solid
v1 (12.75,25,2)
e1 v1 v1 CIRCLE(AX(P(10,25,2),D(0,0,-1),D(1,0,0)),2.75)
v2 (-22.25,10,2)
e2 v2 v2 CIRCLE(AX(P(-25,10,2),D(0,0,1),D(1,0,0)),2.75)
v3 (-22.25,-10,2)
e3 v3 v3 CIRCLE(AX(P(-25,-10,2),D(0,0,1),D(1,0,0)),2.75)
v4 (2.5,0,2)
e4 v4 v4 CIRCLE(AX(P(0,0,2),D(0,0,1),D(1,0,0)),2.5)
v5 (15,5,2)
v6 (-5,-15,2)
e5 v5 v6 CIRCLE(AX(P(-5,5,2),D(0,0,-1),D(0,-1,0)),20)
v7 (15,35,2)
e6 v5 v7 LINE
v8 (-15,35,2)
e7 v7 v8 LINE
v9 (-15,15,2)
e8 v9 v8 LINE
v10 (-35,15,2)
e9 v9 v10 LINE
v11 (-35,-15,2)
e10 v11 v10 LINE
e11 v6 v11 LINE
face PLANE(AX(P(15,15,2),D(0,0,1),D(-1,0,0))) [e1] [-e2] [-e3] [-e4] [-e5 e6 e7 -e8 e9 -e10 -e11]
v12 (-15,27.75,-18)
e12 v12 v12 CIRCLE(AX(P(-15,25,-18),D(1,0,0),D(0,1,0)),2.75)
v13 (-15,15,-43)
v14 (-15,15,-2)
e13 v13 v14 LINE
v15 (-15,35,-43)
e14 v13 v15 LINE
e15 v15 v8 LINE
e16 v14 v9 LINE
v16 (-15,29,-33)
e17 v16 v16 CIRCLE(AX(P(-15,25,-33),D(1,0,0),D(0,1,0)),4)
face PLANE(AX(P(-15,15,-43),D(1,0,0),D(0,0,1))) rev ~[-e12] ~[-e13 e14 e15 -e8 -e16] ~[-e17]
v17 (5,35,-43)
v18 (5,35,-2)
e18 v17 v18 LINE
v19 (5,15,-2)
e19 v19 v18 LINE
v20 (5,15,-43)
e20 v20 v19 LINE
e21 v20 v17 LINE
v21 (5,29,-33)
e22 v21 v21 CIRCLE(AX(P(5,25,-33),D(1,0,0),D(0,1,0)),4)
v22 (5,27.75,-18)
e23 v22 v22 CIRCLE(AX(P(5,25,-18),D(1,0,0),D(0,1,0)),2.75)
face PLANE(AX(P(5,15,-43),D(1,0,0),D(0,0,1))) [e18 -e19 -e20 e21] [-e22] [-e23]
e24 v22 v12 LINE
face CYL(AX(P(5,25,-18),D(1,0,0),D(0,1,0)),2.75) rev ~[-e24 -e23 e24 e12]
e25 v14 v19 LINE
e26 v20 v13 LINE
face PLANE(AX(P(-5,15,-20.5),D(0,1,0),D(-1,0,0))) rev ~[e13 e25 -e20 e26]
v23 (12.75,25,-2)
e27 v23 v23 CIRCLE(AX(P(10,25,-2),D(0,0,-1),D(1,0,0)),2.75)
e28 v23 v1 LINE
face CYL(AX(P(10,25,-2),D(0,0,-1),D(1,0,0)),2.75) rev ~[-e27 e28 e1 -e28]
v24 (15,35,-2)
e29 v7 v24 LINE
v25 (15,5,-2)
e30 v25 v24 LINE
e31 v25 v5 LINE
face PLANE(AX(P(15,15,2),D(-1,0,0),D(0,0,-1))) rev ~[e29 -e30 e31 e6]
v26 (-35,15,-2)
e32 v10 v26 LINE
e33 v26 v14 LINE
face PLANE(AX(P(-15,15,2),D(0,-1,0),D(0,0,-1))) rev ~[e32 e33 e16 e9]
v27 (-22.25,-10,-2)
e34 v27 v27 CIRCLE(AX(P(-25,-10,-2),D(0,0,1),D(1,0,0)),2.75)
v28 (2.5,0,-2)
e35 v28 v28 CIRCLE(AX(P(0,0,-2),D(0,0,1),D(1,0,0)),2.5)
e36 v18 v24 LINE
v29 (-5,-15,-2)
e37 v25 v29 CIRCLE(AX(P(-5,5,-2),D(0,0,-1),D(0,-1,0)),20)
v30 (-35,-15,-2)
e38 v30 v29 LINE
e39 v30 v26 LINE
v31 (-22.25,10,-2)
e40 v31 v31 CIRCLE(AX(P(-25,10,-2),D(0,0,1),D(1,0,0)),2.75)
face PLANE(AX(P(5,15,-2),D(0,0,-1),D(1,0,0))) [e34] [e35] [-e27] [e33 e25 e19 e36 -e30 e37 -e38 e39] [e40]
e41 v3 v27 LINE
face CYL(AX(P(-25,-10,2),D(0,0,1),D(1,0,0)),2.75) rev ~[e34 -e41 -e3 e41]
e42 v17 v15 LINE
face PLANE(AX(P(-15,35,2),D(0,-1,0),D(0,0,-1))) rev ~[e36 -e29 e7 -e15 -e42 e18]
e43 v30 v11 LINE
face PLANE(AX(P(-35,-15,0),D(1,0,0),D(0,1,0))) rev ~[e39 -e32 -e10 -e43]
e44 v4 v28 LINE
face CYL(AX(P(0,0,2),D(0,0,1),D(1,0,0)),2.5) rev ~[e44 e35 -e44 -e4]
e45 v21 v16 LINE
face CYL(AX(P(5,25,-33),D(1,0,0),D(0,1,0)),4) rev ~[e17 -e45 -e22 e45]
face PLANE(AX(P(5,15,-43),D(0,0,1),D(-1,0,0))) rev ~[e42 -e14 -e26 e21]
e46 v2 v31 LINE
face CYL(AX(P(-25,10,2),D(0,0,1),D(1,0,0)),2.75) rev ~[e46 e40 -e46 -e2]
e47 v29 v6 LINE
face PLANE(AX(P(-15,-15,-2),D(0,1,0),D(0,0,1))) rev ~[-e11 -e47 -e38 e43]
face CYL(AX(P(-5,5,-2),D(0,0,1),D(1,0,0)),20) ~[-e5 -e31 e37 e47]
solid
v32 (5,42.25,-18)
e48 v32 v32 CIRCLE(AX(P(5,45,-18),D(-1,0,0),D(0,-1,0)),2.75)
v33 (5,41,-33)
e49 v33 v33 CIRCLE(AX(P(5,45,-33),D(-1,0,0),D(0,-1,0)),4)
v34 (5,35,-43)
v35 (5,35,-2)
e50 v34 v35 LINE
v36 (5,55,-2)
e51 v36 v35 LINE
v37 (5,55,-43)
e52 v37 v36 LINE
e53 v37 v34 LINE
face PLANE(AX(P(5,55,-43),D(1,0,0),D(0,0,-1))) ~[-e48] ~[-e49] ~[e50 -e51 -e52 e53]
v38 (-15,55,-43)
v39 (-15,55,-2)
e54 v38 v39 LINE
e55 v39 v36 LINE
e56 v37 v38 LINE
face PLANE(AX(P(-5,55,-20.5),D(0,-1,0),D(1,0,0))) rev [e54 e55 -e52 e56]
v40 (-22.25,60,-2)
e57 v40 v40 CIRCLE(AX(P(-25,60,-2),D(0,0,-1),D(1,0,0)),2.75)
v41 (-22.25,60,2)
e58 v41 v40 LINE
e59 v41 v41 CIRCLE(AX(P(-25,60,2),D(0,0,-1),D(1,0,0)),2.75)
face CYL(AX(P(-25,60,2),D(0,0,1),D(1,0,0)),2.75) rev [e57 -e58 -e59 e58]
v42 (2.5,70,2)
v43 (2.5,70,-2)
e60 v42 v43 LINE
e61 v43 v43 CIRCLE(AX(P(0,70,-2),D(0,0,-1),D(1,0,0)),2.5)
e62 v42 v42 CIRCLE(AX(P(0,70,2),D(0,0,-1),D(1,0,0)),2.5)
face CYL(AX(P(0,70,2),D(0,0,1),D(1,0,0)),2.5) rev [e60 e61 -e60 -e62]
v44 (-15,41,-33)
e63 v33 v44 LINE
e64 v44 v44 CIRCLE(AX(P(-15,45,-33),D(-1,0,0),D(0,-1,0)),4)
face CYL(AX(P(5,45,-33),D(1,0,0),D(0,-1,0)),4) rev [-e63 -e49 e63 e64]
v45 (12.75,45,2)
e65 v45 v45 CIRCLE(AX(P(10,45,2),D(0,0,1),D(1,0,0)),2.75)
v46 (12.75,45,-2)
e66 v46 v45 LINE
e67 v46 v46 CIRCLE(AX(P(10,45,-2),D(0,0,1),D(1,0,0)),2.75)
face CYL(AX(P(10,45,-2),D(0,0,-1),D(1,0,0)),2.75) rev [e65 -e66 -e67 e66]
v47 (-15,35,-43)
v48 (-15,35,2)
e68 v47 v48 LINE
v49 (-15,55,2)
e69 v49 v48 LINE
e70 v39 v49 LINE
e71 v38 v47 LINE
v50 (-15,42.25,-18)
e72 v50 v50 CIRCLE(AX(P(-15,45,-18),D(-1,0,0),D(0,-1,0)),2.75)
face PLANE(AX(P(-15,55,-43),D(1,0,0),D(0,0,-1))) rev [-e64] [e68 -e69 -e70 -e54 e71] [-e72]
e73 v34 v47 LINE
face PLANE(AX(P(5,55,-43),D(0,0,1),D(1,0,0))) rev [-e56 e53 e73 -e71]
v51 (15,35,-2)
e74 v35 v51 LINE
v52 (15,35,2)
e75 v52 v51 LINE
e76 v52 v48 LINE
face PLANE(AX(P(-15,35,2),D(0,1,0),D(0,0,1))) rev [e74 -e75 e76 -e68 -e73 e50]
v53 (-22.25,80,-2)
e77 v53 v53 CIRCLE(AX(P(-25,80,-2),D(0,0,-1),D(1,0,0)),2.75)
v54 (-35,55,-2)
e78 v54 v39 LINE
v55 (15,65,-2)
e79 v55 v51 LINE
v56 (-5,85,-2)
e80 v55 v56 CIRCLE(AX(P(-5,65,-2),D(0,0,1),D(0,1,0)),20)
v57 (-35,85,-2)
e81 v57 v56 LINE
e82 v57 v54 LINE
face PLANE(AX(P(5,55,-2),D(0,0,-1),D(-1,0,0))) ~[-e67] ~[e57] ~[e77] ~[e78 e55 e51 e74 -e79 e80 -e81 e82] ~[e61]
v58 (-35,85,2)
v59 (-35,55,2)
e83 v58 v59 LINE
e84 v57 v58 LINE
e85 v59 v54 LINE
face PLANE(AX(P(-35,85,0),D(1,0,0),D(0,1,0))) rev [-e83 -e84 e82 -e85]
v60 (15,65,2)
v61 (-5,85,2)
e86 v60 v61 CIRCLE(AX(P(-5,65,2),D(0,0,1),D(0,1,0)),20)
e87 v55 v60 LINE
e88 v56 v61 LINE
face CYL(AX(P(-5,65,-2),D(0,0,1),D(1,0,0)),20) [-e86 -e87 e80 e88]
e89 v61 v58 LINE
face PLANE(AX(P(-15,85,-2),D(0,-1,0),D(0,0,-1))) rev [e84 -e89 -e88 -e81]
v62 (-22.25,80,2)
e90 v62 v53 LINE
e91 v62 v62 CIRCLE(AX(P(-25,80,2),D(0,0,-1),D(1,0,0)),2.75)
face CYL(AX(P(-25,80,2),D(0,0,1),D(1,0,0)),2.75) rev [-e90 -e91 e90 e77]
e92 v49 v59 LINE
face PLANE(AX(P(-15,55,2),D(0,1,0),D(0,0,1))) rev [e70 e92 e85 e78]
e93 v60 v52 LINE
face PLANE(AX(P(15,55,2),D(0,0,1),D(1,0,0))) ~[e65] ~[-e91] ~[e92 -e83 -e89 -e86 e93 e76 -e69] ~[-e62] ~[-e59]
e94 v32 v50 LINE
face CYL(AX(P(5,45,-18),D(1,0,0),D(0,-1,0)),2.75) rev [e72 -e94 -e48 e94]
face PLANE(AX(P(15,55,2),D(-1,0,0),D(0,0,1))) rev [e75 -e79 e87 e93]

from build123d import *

# Parameters (mm, degrees)
F0_W      = 30
F0_H      = 30
F1_DEPTH  = 2
F2_DEPTH  = 20
F3_R      = 2.75
F4_DEPTH  = 4.001
F5_W      = 20
F5_H      = 45
F6_DEPTH  = 20
F7_DEPTH  = 20
F8_R      = 4
F8_R_2    = 2.75
F9_DEPTH  = 40.001
F10_R     = 2.75
F11_DEPTH = 4.001
F12_R     = 2.5
F13_DEPTH = 45.001
F14_R     = 20


with BuildPart() as f1:
    # F0 (on Top) → F1 (new body, symmetric)
    with BuildSketch(Plane.XY):
        Rectangle(F0_W, F0_H)
    extrude(amount=F1_DEPTH, both=True)

    # F2 (add): a face of the model
    f2_faces = [f1.faces().sort_by_distance(p)[0] for p in [
        (-15, 0, 0),
    ]]
    extrude(f2_faces, amount=F2_DEPTH)

    # F3 (on face) → F4 (cut, through all)
    with BuildSketch(Plane.XY.offset(2)):
        with Locations((-25, 10)):
            Circle(F3_R)
        with Locations((-25, -10)):
            Circle(F3_R)
    extrude(amount=-F4_DEPTH, mode=Mode.SUBTRACT)

    # F5 (on face) → F6 (join)
    with BuildSketch(Plane(origin=(0, 15, 0), x_dir=(-1, 0, 0), z_dir=(0, 1, 0))):
        with Locations((5, -20.5)):
            Rectangle(F5_W, F5_H)
    extrude(amount=F6_DEPTH)

    # F7 (add, through all): a face of the model
    f7_faces = [f1.faces().sort_by_distance(p)[0] for p in [
        (10, 15, 0),
    ]]
    extrude(f7_faces, amount=F7_DEPTH)

    # F8 (on face) → F9 (cut, through all)
    with BuildSketch(Plane.YZ.offset(5)):
        with Locations((25, -33)):
            Circle(F8_R)
        with Locations((25, -18)):
            Circle(F8_R_2)
    extrude(amount=-F9_DEPTH, mode=Mode.SUBTRACT)

    # F10 (on face) → F11 (cut, through all)
    with BuildSketch(Plane(origin=(0, 0, -2), x_dir=(1, 0, 0), z_dir=(0, 0, -1))):
        with Locations((10, -25)):
            Circle(F10_R)
    extrude(amount=-F11_DEPTH, mode=Mode.SUBTRACT)

    # F12 (on face) → F13 (cut, through all)
    with BuildSketch(Plane.XY.offset(2)):
        Circle(F12_R)
    extrude(amount=-F13_DEPTH, mode=Mode.SUBTRACT)

    # F14
    f14_edges = [f1.edges().sort_by_distance(p)[0] for p in [
        (15, -15, 0),
    ]]
    fillet(f14_edges, radius=F14_R)


with BuildPart() as f15_1:
    # F15: instance of F1
    add(f1.part.mirror(Plane(origin=(-4.3617021277, 35, -19.6276595745), x_dir=(-1, 0, 0), z_dir=(0, 1, 0))))


solid = Compound([f1.part, f15_1.part])
